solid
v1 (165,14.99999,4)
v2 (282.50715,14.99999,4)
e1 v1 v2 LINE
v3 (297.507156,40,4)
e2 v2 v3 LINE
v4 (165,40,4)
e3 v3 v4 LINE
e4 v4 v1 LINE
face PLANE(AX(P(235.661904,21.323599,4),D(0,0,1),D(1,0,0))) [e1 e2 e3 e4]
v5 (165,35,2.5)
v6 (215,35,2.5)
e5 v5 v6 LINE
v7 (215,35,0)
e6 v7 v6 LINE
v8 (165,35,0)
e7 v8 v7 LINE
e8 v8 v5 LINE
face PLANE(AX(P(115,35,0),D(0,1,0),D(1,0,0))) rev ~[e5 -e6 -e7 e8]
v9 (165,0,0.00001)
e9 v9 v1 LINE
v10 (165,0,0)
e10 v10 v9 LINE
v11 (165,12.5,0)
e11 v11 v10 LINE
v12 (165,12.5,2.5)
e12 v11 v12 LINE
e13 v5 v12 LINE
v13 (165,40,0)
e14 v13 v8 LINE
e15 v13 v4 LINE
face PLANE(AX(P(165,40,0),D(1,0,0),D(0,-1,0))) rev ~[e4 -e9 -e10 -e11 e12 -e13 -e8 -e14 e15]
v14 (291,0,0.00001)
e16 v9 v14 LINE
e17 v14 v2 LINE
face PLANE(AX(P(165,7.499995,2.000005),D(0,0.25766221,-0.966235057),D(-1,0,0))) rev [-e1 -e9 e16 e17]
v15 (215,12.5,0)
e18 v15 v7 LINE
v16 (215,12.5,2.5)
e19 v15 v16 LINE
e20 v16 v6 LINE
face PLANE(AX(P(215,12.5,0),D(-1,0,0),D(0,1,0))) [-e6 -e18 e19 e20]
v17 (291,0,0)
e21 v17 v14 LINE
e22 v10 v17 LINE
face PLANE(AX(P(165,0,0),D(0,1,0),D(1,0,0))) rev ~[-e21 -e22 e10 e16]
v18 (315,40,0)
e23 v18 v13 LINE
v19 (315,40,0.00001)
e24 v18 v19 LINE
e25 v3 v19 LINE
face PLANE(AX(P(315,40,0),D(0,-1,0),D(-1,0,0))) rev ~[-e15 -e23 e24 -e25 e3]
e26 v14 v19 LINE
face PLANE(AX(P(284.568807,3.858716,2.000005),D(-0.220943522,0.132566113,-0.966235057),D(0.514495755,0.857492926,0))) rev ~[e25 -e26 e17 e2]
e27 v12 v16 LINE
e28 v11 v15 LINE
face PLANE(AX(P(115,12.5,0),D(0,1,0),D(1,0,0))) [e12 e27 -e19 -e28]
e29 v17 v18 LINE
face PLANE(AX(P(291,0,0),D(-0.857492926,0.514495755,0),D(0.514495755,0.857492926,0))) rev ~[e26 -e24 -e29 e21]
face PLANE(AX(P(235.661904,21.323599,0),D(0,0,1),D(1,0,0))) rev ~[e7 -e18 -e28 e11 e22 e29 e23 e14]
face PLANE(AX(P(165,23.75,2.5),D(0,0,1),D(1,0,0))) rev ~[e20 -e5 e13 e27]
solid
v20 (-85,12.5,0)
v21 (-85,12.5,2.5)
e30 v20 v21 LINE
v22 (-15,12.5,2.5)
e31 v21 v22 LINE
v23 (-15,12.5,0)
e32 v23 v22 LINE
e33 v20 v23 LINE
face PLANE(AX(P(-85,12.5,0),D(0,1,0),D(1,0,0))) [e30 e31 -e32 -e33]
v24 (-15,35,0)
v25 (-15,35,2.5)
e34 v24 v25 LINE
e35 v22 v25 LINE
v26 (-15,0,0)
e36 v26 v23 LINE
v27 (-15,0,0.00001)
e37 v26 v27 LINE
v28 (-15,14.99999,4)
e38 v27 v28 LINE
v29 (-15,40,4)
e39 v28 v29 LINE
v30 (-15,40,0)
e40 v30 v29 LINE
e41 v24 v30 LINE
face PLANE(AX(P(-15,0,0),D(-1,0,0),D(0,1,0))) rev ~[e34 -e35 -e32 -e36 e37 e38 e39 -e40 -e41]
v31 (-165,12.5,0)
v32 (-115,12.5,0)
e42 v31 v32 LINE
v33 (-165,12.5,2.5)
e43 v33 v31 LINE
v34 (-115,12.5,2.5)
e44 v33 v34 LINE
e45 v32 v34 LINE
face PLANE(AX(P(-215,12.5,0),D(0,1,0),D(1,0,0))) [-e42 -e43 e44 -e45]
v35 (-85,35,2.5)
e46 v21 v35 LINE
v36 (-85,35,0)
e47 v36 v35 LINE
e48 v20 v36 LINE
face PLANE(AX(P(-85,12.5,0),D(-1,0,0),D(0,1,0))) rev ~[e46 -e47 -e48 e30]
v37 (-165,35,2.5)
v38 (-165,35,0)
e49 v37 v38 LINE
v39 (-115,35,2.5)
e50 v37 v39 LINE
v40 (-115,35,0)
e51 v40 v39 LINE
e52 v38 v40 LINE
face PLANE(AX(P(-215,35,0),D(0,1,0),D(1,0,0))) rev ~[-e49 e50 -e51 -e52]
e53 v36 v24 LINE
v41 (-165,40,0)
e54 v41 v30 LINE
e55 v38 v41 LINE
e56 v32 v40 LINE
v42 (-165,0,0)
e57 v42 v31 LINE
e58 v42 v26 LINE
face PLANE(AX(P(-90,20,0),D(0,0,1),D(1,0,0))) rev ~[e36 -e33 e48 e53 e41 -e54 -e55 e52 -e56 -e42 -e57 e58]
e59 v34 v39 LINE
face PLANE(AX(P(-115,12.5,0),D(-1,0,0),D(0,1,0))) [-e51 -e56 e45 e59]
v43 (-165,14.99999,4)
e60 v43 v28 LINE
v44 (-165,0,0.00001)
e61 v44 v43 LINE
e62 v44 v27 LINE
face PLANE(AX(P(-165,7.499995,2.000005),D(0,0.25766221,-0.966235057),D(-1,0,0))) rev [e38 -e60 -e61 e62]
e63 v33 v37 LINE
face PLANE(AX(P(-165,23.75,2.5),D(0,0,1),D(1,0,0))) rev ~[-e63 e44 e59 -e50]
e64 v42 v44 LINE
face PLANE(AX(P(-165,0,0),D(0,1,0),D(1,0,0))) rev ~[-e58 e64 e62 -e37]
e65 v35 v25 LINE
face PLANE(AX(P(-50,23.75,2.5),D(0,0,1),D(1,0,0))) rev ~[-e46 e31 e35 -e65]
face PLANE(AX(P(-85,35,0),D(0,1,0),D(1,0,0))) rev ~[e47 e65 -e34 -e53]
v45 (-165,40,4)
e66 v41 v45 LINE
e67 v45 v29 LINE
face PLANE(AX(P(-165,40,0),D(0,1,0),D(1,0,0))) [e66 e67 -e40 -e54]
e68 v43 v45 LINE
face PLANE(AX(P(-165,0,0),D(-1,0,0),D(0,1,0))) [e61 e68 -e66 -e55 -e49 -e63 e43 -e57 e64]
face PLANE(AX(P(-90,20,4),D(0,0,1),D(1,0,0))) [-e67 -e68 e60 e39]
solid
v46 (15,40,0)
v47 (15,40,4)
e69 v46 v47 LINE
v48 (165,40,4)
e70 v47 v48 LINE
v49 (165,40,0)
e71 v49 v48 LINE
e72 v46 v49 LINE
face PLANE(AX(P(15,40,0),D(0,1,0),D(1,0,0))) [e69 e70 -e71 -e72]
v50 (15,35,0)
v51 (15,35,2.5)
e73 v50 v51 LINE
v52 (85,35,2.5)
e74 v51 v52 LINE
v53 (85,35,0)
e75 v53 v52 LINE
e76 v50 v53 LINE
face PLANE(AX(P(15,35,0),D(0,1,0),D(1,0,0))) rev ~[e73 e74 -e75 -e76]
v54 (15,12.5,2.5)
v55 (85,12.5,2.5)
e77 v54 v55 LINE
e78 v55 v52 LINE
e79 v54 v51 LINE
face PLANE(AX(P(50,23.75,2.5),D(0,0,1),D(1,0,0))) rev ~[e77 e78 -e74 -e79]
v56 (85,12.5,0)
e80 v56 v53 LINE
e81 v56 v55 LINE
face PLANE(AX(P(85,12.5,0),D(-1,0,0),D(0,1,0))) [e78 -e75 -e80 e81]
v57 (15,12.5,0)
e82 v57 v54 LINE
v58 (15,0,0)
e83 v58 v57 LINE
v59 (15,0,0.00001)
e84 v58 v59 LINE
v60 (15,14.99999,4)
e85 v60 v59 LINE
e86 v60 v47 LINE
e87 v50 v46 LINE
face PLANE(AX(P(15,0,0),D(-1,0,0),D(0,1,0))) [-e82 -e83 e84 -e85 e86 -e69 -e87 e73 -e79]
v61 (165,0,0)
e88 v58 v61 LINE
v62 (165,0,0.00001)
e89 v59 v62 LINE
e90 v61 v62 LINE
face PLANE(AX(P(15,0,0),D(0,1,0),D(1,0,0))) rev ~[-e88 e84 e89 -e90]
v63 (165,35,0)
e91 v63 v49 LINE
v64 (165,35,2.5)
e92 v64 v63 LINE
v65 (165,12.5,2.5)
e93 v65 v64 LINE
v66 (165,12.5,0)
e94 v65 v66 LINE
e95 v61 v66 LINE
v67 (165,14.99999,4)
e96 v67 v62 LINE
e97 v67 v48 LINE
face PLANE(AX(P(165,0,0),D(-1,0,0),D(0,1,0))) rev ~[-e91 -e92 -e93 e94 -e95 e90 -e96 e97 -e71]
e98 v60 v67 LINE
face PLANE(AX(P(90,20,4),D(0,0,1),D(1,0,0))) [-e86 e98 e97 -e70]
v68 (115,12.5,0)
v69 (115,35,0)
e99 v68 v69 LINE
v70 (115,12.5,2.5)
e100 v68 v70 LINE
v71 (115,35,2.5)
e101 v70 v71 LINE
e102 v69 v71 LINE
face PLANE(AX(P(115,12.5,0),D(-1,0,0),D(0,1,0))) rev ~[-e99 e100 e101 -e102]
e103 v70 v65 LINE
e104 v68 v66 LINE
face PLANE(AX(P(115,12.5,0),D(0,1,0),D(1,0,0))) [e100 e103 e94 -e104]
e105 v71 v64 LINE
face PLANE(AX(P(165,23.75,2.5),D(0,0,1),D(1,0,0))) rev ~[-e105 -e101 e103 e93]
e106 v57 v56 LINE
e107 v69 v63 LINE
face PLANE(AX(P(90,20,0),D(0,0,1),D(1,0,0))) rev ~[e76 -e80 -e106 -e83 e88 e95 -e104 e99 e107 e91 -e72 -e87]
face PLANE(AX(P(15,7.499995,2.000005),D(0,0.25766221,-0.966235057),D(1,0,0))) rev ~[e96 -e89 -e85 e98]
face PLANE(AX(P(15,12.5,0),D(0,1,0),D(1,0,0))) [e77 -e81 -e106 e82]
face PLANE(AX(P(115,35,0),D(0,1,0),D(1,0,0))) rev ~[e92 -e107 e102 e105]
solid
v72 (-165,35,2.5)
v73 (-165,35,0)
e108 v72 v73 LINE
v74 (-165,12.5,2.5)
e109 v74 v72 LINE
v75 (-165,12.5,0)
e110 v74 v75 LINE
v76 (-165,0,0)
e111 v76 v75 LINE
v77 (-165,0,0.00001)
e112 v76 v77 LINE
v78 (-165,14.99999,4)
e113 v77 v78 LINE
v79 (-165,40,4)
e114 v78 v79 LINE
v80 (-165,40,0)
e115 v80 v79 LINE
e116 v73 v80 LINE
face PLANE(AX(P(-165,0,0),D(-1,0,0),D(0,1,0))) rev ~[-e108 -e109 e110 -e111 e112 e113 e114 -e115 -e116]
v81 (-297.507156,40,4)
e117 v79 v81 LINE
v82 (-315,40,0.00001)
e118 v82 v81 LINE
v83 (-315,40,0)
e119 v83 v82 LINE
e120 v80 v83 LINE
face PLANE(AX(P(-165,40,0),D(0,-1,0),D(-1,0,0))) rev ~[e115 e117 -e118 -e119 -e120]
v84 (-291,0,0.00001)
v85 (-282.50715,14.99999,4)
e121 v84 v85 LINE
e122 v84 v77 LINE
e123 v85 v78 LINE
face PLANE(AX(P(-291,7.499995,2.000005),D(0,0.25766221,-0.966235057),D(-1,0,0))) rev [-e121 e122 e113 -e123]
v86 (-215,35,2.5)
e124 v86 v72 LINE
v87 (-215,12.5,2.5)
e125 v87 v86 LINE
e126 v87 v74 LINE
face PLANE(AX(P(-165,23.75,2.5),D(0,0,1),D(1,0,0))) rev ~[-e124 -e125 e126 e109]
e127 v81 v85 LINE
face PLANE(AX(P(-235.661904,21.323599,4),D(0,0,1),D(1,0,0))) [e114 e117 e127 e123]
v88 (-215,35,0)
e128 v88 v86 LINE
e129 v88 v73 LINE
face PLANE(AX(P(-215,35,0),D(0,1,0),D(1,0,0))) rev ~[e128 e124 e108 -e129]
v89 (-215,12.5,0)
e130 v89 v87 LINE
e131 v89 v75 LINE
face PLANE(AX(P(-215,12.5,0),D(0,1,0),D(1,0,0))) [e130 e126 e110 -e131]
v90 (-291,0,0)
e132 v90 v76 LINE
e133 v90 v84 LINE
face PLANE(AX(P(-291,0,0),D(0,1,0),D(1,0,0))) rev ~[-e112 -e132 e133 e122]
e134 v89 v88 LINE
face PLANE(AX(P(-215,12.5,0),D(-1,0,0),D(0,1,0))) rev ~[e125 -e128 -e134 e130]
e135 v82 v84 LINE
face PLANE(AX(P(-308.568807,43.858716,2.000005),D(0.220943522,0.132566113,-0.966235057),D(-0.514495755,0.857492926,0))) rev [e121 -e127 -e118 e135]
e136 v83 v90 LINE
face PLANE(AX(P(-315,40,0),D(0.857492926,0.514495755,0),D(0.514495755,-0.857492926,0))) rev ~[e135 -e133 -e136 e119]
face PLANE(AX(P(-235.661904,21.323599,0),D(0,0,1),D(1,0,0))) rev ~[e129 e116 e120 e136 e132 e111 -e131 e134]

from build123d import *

# Parameters (mm, degrees)
F1_DEPTH   = 4
F0_W       = 150
F0_H       = 40
F2_DEPTH   = 4
F3_SIZE2   = 3.99999
F3_SIZE    = 14.99999
F3_2_SIZE2 = 3.99999
F3_2_SIZE  = 14.99999
F4_SIZE2   = 14.99999
F4_SIZE    = 3.99999
F4_2_SIZE2 = 14.99999
F4_2_SIZE  = 3.99999
F4_3_SIZE2 = 14.99999
F4_3_SIZE  = 3.99999
F5_W       = 100
F5_H       = 22.5
F5_W_2     = 70
F6_DEPTH   = 2.5


# Not quite as in the source:
# - a fillet or chamfer is up to 0.001 mm smaller than in the source, because OpenCascade refuses the exact size


with BuildPart() as f1:
    # F0 (on Top) → F1 (new body)
    with BuildSketch(Plane.XY):
        Polygon((-291, 0), (-165, 0), (-165, 40), (-315, 40), align=None)
    extrude(amount=F1_DEPTH)

    # F4 (size 4 and 15 in the source; OpenCascade refuses exactly that, so slightly less here)
    f4_edges = [f1.edges().sort_by_distance(p)[0] for p in [
        (-228, 0, 4),
        (-303, 20, 4),
    ]]
    chamfer(f4_edges, length=F4_SIZE, length2=F4_SIZE2)


with BuildPart() as f1b:
    # F0 (on Top) → F1, piece 2 (new body)
    with BuildSketch(Plane.XY):
        Polygon((165, 40), (165, 0), (291, 0), (315, 40), align=None)
    extrude(amount=F1_DEPTH)

    # F3#2 (size 15 and 4 in the source; OpenCascade refuses exactly that, so slightly less here)
    f3_2_edges = [f1b.edges().sort_by_distance(p)[0] for p in [
        (303, 20, 4),
    ]]
    f3_2_side = f1b.faces().sort_by_distance((234.173913, 20.57971, 4))[0]
    chamfer(f3_2_edges, length=F3_2_SIZE, length2=F3_2_SIZE2, reference=f3_2_side)

    # F4#3 (size 4 and 15 in the source; OpenCascade refuses exactly that, so slightly less here)
    f4_3_edges = [f1b.edges().sort_by_distance(p)[0] for p in [
        (219.253578, 0, 4),
    ]]
    chamfer(f4_3_edges, length=F4_3_SIZE, length2=F4_3_SIZE2)


with BuildPart() as f2:
    # F0 (on Top) → F2 (new body)
    with BuildSketch(Plane.XY):
        with Locations((-90, 20)):
            Rectangle(F0_W, F0_H)
    extrude(amount=F2_DEPTH)

    # F4#2 (size 4 and 15 in the source; OpenCascade refuses exactly that, so slightly less here)
    f4_2_edges = [f2.edges().sort_by_distance(p)[0] for p in [
        (-90, 0, 4),
    ]]
    chamfer(f4_2_edges, length=F4_2_SIZE, length2=F4_2_SIZE2)


with BuildPart() as f2b:
    # F0 (on Top) → F2, piece 2 (new body)
    with BuildSketch(Plane.XY):
        with Locations((90, 20)):
            Rectangle(F0_W, F0_H)
    extrude(amount=F2_DEPTH)

    # F3 (size 15 and 4 in the source; OpenCascade refuses exactly that, so slightly less here)
    f3_edges = [f2b.edges().sort_by_distance(p)[0] for p in [
        (90, 0, 4),
    ]]
    f3_side = f2b.faces().sort_by_distance((90, 20, 4))[0]
    chamfer(f3_edges, length=F3_SIZE, length2=F3_SIZE2, reference=f3_side)


with BuildPart() as f6_tool:
    # F5 (on face) → F6 (new body)
    with BuildSketch(Plane.XY):
        with Locations((165, 23.75)):
            Rectangle(F5_W, F5_H)
        with Locations((50, 23.75)):
            Rectangle(F5_W_2, F5_H)
        with Locations((-165, 23.75)):
            Rectangle(F5_W, F5_H)
        with Locations((-50, 23.75)):
            Rectangle(F5_W_2, F5_H)
    extrude(amount=F6_DEPTH)


with BuildPart() as f1_1:
    add(f1.part)

    # F6: cut by f6_tool
    add(f6_tool.part, mode=Mode.SUBTRACT)


with BuildPart() as f1b_1:
    add(f1b.part)

    # F6: cut by f6_tool
    add(f6_tool.part, mode=Mode.SUBTRACT)


with BuildPart() as f2_1:
    add(f2.part)

    # F6: cut by f6_tool
    add(f6_tool.part, mode=Mode.SUBTRACT)


with BuildPart() as f2b_1:
    add(f2b.part)

    # F6: cut by f6_tool
    add(f6_tool.part, mode=Mode.SUBTRACT)


solid = Compound([f1_1.part, f1b_1.part, f2_1.part, f2b_1.part])
